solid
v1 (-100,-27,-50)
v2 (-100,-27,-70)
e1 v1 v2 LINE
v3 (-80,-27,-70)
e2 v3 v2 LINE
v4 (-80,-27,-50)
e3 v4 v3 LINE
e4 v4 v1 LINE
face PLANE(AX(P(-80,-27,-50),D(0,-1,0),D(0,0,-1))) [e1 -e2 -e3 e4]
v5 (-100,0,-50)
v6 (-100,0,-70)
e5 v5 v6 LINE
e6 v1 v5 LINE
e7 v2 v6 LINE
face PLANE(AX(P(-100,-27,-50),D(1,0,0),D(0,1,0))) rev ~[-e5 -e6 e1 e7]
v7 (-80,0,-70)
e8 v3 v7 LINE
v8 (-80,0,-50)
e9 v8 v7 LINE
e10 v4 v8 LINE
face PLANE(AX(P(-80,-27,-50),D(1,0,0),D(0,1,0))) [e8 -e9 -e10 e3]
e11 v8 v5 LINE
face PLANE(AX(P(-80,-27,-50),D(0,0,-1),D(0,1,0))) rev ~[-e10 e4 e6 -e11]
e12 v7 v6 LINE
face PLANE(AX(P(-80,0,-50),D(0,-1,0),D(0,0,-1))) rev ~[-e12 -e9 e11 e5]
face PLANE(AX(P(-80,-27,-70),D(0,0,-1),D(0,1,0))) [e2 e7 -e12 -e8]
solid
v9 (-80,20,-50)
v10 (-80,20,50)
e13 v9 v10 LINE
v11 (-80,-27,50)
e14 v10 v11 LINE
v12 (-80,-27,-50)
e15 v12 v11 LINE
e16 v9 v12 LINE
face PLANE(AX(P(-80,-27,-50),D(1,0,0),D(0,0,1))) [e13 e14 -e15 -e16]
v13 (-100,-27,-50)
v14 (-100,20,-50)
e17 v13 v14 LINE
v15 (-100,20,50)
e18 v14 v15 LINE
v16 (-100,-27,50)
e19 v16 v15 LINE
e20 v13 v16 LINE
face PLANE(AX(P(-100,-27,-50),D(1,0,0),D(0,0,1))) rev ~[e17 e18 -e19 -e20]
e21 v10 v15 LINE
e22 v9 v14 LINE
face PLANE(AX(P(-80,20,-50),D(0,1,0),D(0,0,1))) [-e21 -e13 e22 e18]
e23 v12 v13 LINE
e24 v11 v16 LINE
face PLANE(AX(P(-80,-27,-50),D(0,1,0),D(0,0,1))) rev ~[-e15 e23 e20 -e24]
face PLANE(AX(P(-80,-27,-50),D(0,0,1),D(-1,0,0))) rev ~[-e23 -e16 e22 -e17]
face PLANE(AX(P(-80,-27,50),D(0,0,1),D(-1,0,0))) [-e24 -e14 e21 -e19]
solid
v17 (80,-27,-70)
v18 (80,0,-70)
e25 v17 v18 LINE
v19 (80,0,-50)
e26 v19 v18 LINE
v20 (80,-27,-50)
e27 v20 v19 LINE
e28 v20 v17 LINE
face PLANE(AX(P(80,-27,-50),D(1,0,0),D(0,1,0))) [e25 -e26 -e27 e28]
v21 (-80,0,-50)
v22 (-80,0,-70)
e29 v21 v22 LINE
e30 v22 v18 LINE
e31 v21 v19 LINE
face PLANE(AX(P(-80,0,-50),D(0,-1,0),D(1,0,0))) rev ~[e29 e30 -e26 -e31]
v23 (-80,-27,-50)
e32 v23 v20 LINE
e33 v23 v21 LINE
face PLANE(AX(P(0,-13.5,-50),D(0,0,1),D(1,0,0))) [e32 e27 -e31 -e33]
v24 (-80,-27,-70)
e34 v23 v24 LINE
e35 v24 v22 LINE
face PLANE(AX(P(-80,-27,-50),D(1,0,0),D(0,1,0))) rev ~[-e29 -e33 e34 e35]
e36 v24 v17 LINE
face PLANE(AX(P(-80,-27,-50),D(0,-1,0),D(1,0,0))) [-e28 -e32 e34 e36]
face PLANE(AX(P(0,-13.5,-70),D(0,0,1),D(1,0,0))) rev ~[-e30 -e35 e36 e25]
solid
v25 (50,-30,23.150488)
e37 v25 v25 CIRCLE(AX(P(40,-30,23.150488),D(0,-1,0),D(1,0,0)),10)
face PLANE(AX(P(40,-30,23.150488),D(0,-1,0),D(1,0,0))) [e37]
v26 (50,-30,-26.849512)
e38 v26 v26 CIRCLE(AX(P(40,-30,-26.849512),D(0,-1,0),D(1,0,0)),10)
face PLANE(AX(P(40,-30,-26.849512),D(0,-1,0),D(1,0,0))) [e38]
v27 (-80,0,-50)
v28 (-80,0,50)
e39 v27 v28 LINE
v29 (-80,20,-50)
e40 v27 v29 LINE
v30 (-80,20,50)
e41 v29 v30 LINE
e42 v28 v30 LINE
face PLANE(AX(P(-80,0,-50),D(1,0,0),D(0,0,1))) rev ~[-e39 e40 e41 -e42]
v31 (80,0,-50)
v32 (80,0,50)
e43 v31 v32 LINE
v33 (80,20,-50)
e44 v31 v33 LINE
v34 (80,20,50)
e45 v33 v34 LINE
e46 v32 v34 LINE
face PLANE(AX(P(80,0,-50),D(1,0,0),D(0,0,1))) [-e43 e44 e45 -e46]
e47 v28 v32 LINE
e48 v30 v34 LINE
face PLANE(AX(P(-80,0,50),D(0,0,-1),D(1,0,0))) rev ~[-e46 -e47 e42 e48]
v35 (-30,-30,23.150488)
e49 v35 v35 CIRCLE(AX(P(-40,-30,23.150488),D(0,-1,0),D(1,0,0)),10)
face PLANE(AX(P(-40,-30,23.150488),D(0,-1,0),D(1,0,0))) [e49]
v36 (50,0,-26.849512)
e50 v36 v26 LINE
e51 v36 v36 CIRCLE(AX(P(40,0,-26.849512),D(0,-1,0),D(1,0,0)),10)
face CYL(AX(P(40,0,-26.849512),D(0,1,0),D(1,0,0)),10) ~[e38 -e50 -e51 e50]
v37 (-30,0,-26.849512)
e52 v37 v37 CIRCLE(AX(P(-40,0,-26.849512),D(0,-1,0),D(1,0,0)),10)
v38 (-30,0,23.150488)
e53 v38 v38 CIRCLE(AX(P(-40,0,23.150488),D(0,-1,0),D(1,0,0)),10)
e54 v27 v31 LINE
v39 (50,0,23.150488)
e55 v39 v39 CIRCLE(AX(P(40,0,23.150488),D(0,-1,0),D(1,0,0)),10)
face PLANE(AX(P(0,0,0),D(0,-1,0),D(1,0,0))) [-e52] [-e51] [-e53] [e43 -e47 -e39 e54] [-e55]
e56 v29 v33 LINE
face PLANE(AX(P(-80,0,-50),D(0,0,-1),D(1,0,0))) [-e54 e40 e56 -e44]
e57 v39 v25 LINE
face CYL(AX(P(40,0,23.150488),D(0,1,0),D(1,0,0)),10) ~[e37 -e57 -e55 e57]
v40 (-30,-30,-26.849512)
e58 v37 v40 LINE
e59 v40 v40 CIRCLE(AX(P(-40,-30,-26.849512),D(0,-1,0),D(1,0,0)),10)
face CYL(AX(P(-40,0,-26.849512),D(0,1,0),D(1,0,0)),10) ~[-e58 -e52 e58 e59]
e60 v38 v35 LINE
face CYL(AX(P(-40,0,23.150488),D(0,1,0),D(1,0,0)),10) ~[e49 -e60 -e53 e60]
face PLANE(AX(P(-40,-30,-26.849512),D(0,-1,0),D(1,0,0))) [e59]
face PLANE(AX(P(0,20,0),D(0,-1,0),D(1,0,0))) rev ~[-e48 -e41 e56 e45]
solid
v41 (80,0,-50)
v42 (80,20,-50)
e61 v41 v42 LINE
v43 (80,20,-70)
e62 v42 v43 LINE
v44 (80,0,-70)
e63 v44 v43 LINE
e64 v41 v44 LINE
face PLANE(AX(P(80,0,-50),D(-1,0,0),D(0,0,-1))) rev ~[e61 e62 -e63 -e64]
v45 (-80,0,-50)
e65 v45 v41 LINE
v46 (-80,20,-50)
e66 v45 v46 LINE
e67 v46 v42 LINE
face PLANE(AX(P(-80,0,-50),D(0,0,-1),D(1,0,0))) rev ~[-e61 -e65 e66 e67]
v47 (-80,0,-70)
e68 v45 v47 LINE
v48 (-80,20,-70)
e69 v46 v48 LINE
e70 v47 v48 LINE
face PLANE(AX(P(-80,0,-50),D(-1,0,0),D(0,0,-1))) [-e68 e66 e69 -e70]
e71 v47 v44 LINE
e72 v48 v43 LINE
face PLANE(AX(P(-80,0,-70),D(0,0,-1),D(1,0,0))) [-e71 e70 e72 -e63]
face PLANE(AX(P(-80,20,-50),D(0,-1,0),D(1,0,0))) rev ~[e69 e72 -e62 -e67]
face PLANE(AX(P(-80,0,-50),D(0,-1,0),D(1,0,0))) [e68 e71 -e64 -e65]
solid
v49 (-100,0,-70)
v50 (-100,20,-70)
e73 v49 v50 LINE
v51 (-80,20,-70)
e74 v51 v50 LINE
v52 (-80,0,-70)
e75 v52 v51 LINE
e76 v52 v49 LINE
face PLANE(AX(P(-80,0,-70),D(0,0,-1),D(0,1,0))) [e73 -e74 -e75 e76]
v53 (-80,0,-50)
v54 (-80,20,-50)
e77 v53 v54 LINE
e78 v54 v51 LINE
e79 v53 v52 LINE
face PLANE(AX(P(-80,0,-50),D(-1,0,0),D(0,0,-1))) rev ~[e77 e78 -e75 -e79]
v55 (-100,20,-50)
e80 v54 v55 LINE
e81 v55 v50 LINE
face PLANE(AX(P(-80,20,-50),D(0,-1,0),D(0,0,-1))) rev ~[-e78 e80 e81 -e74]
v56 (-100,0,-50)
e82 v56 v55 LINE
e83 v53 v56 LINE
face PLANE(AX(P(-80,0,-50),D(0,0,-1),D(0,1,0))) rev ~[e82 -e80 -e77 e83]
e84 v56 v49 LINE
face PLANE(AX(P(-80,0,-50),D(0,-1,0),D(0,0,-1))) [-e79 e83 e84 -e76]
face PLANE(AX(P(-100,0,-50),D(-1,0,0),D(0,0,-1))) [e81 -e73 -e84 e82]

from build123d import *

# Parameters (mm, degrees)
F0_W      = 160
F0_H      = 100
F1_DEPTH  = 20
F3_W      = 27
F3_H      = 100
F4_DEPTH  = 20
F5_DEPTH  = 20
F6_R      = 10
F7_DEPTH  = 30
F9_W      = 160
F9_H      = 27
F10_DEPTH = 20
F11_DEPTH = 20
F12_DEPTH = 20
F13_DEPTH = 20


with BuildPart() as f1:
    # F0 (on Front) → F1 (new body)
    with BuildSketch(Plane.XZ):
        Rectangle(F0_W, F0_H)
    extrude(amount=-F1_DEPTH)

    # F6 (on face) → F7 (join)
    with BuildSketch(Plane.XZ):
        with Locations((-40, -26.8495120108)):
            Circle(F6_R)
        with Locations((-40, 23.1504879892)):
            Circle(F6_R)
        with Locations((40, -26.8495120108)):
            Circle(F6_R)
        with Locations((40, 23.1504879892)):
            Circle(F6_R)
    extrude(amount=F7_DEPTH)


with BuildPart() as f4:
    # F3 (on offset) → F4 (new body)
    with BuildSketch(Plane.YZ.offset(-80)):
        with Locations((-13.5, 0)):
            Rectangle(F3_W, F3_H)
    extrude(amount=-F4_DEPTH)

    # F5 (add): faces of the model
    f5_faces = [f4.faces().sort_by_distance(p)[0] for p in [
        (-90, -27, 0),
        (-90, 0, 0),
    ]]
    extrude(f5_faces, amount=-F5_DEPTH, dir=(0, -1, 0))


with BuildPart() as f10:
    # F9 (on offset) → F10 (new body)
    with BuildSketch(Plane.XY.offset(-50)):
        with Locations((0, -13.5)):
            Rectangle(F9_W, F9_H)
    extrude(amount=-F10_DEPTH)


with BuildPart() as f11:
    # F11 (new, through all): a face of the model
    f11_faces = [f10.part.faces().sort_by_distance(p)[0] for p in [
        (0, 0, -60),
    ]]
    extrude(f11_faces, amount=F11_DEPTH)


with BuildPart() as f12:
    # F12 (new, through all): a face of the model
    f12_faces = [f10.part.faces().sort_by_distance(p)[0] for p in [
        (-80, -13.5, -60),
    ]]
    extrude(f12_faces, amount=F12_DEPTH)


with BuildPart() as f13:
    # F13 (new, through all): a face of the model
    f13_faces = [f11.part.faces().sort_by_distance(p)[0] for p in [
        (-80, 10, -60),
    ]]
    extrude(f13_faces, amount=F13_DEPTH)


solid = Compound([f1.part, f4.part, f10.part, f11.part, f12.part, f13.part])
